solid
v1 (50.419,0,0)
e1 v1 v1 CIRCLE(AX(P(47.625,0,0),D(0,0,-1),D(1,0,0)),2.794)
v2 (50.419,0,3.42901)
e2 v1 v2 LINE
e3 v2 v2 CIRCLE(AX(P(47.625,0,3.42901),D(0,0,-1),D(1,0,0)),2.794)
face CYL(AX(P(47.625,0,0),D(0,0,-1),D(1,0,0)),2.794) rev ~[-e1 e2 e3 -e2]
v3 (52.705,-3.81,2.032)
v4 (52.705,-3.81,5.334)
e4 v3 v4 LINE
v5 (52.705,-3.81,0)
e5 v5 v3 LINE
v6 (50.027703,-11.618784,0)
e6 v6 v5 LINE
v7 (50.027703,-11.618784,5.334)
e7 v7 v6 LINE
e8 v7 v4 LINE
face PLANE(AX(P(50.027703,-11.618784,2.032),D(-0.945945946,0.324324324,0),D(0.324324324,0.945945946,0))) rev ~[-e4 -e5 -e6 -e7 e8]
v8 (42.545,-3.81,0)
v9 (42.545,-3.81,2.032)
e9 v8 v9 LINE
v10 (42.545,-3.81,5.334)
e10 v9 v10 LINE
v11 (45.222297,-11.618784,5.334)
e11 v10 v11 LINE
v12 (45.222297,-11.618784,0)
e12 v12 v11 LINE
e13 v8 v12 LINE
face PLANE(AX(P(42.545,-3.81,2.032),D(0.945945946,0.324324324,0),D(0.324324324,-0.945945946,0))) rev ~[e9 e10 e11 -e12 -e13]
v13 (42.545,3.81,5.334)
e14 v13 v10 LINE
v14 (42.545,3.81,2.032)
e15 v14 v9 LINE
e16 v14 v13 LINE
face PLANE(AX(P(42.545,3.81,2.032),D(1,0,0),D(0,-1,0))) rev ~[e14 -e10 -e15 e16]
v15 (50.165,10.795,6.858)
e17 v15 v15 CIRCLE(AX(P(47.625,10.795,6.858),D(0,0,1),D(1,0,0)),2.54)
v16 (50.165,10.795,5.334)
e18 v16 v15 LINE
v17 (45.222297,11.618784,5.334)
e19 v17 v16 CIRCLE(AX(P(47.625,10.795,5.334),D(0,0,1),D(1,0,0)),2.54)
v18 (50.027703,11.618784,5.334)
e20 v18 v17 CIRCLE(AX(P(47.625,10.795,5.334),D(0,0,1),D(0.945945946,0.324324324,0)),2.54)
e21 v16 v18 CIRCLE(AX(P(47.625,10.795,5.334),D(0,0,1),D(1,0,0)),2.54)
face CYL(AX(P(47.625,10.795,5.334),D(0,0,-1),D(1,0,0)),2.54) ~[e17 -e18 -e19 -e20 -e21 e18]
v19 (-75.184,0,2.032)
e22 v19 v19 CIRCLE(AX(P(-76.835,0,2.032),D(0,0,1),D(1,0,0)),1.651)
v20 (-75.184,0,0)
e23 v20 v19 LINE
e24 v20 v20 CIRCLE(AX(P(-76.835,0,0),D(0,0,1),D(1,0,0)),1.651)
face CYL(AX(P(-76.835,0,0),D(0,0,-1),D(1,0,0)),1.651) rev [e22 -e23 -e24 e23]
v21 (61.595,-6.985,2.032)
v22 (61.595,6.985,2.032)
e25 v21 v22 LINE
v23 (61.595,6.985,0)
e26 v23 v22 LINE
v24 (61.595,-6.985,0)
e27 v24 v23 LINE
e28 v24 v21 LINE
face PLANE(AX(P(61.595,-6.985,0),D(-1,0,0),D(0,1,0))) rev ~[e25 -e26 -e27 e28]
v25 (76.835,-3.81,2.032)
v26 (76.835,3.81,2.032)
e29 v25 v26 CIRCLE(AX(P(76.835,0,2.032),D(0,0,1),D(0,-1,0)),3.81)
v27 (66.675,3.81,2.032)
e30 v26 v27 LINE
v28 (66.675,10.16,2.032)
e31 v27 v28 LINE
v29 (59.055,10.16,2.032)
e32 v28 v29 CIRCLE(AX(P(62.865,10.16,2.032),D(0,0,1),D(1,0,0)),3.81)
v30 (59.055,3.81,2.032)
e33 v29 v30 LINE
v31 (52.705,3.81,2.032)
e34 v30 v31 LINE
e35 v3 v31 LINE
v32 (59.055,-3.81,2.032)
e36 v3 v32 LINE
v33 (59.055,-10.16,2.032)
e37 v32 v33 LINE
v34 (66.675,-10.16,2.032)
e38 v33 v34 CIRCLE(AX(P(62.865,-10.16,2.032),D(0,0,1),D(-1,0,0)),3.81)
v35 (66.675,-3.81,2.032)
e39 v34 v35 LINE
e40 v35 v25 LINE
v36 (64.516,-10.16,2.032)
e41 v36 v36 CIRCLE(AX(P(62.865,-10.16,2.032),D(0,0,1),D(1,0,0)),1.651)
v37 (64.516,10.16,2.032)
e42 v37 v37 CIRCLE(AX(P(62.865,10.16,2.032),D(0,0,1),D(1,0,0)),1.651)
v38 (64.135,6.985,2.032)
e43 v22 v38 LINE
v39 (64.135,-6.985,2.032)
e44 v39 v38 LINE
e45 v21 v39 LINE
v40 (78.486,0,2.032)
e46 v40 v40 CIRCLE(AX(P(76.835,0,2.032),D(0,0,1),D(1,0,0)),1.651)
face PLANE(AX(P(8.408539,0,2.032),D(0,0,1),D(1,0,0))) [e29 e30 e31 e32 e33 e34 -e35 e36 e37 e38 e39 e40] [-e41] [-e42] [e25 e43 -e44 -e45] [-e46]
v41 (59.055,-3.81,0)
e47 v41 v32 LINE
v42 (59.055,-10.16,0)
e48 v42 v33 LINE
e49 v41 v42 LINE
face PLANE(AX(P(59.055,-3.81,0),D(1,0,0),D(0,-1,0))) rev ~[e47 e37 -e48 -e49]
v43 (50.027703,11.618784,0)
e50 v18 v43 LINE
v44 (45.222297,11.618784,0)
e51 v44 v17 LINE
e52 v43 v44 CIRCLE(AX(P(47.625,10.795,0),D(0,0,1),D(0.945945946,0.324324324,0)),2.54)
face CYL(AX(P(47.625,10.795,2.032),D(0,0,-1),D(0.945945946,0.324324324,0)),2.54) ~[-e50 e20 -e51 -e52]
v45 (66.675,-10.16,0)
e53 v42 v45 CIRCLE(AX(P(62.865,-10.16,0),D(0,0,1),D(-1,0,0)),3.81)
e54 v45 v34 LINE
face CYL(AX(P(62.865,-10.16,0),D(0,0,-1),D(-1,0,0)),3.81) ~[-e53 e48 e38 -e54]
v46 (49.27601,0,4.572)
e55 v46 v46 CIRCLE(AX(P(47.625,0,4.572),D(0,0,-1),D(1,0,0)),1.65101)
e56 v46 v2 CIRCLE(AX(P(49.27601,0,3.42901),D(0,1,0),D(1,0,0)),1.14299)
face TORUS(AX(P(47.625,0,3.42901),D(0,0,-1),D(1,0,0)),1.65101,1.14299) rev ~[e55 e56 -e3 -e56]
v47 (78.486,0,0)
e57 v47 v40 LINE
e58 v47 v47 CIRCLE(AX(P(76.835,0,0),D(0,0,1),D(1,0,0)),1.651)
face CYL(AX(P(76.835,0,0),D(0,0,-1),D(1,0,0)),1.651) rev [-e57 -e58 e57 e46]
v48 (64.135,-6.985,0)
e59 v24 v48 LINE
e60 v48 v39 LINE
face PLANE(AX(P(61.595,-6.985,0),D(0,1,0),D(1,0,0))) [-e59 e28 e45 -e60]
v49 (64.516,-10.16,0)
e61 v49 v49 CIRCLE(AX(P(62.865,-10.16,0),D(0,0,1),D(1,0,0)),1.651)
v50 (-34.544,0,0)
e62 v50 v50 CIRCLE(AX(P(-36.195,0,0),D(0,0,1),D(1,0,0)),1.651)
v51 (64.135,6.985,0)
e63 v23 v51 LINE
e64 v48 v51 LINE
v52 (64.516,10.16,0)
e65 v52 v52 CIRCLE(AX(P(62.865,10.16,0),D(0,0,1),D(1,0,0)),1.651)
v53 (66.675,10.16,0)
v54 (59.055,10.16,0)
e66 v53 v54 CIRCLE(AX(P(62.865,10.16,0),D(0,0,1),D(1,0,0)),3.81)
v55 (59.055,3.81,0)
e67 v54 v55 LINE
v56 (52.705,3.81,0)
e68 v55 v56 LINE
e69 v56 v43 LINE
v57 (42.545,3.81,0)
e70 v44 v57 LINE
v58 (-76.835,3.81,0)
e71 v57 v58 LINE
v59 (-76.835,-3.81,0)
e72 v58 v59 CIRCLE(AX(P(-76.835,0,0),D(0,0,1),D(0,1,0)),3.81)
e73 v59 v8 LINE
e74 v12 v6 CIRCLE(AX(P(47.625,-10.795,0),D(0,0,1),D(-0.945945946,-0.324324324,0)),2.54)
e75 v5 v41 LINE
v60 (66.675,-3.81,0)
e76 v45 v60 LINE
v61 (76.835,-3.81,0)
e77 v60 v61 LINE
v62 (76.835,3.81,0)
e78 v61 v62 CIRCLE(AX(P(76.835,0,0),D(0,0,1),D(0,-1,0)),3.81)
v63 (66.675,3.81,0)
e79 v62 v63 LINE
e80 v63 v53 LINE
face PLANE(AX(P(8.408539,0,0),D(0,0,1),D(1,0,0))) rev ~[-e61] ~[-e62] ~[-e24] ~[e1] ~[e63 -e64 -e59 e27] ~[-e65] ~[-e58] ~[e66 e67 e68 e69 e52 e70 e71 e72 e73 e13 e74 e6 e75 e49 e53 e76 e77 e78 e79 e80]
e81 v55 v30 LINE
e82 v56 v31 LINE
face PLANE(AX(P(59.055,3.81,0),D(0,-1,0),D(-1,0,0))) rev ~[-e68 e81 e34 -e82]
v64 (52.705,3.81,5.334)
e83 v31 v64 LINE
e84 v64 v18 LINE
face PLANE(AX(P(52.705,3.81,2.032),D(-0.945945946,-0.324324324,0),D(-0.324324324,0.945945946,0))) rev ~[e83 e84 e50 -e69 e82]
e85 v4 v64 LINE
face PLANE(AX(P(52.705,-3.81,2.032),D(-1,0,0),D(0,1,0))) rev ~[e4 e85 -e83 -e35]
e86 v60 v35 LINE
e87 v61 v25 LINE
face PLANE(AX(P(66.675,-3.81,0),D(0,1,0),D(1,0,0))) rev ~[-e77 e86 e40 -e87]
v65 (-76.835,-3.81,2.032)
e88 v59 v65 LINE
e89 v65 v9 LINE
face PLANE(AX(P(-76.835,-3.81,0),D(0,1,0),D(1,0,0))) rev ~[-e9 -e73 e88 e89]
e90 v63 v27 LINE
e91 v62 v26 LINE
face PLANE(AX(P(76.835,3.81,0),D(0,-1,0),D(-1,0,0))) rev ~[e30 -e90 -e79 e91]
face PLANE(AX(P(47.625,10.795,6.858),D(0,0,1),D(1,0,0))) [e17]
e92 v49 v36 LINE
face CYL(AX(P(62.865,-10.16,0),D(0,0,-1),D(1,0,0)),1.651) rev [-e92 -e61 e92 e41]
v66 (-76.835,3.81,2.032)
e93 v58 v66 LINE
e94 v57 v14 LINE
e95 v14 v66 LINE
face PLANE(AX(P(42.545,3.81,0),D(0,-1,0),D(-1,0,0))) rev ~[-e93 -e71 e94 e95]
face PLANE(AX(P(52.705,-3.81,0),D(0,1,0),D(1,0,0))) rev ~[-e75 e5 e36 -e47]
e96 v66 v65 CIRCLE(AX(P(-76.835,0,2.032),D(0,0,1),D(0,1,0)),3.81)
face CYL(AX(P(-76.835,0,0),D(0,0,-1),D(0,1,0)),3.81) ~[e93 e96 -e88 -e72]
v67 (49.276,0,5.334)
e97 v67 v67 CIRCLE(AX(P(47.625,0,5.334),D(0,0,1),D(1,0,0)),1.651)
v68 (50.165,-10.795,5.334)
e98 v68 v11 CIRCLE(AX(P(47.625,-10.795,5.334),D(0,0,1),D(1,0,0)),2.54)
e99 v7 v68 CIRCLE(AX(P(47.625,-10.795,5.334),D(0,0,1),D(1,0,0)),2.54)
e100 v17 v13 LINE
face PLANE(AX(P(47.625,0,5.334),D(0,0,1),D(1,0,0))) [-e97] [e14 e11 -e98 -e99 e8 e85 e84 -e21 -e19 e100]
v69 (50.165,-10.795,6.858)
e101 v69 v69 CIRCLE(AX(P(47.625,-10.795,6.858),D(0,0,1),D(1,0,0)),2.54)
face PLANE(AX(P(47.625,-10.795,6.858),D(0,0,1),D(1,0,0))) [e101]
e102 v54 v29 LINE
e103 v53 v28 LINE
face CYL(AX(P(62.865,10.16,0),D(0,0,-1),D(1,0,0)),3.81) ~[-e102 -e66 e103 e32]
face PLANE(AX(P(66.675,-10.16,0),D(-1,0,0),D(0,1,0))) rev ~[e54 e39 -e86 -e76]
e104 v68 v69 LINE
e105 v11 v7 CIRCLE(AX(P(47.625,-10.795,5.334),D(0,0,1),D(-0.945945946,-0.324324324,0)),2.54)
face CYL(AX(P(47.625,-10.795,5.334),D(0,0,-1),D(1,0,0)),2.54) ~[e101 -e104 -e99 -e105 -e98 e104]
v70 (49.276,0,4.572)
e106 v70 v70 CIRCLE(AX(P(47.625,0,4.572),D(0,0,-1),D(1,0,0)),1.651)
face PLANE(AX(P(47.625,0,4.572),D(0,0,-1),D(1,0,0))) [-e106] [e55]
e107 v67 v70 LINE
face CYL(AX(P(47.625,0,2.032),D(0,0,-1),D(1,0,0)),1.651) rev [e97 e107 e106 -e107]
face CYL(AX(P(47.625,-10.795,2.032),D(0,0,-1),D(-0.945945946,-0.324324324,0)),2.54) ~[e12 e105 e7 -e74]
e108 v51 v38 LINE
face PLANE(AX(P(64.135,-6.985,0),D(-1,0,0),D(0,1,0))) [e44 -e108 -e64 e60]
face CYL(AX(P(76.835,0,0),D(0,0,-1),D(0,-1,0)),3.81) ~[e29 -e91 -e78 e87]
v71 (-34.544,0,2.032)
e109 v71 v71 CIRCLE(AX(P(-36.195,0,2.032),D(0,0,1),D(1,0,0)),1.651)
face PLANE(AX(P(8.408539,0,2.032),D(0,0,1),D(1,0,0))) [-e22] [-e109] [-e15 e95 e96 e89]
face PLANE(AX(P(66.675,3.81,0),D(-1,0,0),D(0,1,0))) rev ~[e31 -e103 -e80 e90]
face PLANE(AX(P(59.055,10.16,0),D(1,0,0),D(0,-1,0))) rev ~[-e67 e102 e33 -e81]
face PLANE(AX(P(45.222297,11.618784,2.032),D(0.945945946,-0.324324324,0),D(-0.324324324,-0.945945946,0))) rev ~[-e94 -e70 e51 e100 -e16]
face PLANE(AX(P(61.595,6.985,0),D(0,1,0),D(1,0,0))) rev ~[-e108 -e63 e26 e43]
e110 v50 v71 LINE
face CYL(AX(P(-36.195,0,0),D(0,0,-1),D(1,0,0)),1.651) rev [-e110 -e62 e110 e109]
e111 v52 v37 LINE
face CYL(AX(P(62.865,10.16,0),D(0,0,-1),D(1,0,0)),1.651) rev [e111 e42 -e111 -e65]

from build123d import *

# Parameters (mm, degrees)
F0_R     = 1.651
F0_W     = 2.54
F0_H     = 13.97
F1_DEPTH = 2.032
F2_R     = 1.651
F3_DEPTH = 3.302
F4_R     = 2.54
F5_DEPTH = 1.524
F6_R     = 2.794
F7_DEPTH = 4.572
F8_R     = 1.14299


# Not quite as in the source:
# - a fillet or chamfer is up to 0.001 mm smaller than in the source, because OpenCascade refuses the exact size


with BuildPart() as f1:
    # F0 (on Top) → F1 (new body)
    with BuildSketch(Plane.XY):
        with BuildLine():
            Line((42.545, 3.81), (-76.835, 3.81))
            ThreePointArc((-76.835, 3.81), (-80.645, 0), (-76.835, -3.81))
            Line((-76.835, -3.81), (42.545, -3.81))
            Line((42.545, -3.81), (45.2222972973, -11.6187837838))
            ThreePointArc((45.2222972973, -11.6187837838), (47.625, -13.335), (50.0277027027, -11.6187837838))
            Line((50.0277027027, -11.6187837838), (52.705, -3.81))
            Line((52.705, -3.81), (59.055, -3.81))
            Line((59.055, -3.81), (59.055, -10.16))
            ThreePointArc((59.055, -10.16), (62.865, -13.97), (66.675, -10.16))
            Line((66.675, -10.16), (66.675, -3.81))
            Line((66.675, -3.81), (76.835, -3.81))
            ThreePointArc((76.835, -3.81), (80.645, 0), (76.835, 3.81))
            Line((76.835, 3.81), (66.675, 3.81))
            Line((66.675, 3.81), (66.675, 10.16))
            ThreePointArc((66.675, 10.16), (62.865, 13.97), (59.055, 10.16))
            Line((59.055, 10.16), (59.055, 3.81))
            Line((59.055, 3.81), (52.705, 3.81))
            Line((52.705, 3.81), (50.0277027027, 11.6187837838))
            ThreePointArc((50.0277027027, 11.6187837838), (47.625, 13.335), (45.2222972973, 11.6187837838))
            Line((45.2222972973, 11.6187837838), (42.545, 3.81))
        make_face()
        with Locations((-76.835, 0)):
            Circle(F0_R, mode=Mode.SUBTRACT)
        with Locations((-36.195, 0)):
            Circle(F0_R, mode=Mode.SUBTRACT)
        with Locations((62.865, -10.16)):
            Circle(F0_R, mode=Mode.SUBTRACT)
        with Locations((47.625, 0)):
            Circle(F0_R, mode=Mode.SUBTRACT)
        with Locations((62.865, 0)):
            Rectangle(F0_W, F0_H, mode=Mode.SUBTRACT)
        with Locations((76.835, 0)):
            Circle(F0_R, mode=Mode.SUBTRACT)
        with Locations((62.865, 10.16)):
            Circle(F0_R, mode=Mode.SUBTRACT)
    extrude(amount=F1_DEPTH)

    # F2 (on face) → F3 (join)
    with BuildSketch(Plane.XY.offset(2.032)):
        with BuildLine():
            ThreePointArc((50.0277027027, 11.6187837838), (47.625, 13.335), (45.2222972973, 11.6187837838))
            Line((45.2222972973, 11.6187837838), (42.545, 3.81))
            Line((42.545, 3.81), (42.545, -3.81))
            Line((42.545, -3.81), (45.2222972973, -11.6187837838))
            ThreePointArc((45.2222972973, -11.6187837838), (47.625, -13.335), (50.0277027027, -11.6187837838))
            Line((50.0277027027, -11.6187837838), (52.705, -3.81))
            Line((52.705, -3.81), (52.705, 3.81))
            Line((52.705, 3.81), (50.0277027027, 11.6187837838))
        make_face()
        with Locations((47.625, 0)):
            Circle(F2_R, mode=Mode.SUBTRACT)
    extrude(amount=F3_DEPTH)

    # F4 (on face) → F5 (join)
    with BuildSketch(Plane.XY.offset(5.334)):
        with Locations((47.625, 10.795)):
            Circle(F4_R)
        with Locations((47.625, -10.795)):
            Circle(F4_R)
    extrude(amount=F5_DEPTH)

    # F6 (on face) → F7 (cut)
    with BuildSketch(Plane(origin=(0, 0, 0), x_dir=(1, 0, 0), z_dir=(0, 0, -1))):
        with Locations((47.625, 0)):
            Circle(F6_R)
    extrude(amount=-F7_DEPTH, mode=Mode.SUBTRACT)

    # F8 (radius 1.143 in the source; OpenCascade refuses exactly that, so slightly less here)
    f8_edges = [f1.edges().sort_by_distance(p)[0] for p in [
        (44.831, 0, 4.572),
    ]]
    fillet(f8_edges, radius=F8_R)


solid = f1.part
